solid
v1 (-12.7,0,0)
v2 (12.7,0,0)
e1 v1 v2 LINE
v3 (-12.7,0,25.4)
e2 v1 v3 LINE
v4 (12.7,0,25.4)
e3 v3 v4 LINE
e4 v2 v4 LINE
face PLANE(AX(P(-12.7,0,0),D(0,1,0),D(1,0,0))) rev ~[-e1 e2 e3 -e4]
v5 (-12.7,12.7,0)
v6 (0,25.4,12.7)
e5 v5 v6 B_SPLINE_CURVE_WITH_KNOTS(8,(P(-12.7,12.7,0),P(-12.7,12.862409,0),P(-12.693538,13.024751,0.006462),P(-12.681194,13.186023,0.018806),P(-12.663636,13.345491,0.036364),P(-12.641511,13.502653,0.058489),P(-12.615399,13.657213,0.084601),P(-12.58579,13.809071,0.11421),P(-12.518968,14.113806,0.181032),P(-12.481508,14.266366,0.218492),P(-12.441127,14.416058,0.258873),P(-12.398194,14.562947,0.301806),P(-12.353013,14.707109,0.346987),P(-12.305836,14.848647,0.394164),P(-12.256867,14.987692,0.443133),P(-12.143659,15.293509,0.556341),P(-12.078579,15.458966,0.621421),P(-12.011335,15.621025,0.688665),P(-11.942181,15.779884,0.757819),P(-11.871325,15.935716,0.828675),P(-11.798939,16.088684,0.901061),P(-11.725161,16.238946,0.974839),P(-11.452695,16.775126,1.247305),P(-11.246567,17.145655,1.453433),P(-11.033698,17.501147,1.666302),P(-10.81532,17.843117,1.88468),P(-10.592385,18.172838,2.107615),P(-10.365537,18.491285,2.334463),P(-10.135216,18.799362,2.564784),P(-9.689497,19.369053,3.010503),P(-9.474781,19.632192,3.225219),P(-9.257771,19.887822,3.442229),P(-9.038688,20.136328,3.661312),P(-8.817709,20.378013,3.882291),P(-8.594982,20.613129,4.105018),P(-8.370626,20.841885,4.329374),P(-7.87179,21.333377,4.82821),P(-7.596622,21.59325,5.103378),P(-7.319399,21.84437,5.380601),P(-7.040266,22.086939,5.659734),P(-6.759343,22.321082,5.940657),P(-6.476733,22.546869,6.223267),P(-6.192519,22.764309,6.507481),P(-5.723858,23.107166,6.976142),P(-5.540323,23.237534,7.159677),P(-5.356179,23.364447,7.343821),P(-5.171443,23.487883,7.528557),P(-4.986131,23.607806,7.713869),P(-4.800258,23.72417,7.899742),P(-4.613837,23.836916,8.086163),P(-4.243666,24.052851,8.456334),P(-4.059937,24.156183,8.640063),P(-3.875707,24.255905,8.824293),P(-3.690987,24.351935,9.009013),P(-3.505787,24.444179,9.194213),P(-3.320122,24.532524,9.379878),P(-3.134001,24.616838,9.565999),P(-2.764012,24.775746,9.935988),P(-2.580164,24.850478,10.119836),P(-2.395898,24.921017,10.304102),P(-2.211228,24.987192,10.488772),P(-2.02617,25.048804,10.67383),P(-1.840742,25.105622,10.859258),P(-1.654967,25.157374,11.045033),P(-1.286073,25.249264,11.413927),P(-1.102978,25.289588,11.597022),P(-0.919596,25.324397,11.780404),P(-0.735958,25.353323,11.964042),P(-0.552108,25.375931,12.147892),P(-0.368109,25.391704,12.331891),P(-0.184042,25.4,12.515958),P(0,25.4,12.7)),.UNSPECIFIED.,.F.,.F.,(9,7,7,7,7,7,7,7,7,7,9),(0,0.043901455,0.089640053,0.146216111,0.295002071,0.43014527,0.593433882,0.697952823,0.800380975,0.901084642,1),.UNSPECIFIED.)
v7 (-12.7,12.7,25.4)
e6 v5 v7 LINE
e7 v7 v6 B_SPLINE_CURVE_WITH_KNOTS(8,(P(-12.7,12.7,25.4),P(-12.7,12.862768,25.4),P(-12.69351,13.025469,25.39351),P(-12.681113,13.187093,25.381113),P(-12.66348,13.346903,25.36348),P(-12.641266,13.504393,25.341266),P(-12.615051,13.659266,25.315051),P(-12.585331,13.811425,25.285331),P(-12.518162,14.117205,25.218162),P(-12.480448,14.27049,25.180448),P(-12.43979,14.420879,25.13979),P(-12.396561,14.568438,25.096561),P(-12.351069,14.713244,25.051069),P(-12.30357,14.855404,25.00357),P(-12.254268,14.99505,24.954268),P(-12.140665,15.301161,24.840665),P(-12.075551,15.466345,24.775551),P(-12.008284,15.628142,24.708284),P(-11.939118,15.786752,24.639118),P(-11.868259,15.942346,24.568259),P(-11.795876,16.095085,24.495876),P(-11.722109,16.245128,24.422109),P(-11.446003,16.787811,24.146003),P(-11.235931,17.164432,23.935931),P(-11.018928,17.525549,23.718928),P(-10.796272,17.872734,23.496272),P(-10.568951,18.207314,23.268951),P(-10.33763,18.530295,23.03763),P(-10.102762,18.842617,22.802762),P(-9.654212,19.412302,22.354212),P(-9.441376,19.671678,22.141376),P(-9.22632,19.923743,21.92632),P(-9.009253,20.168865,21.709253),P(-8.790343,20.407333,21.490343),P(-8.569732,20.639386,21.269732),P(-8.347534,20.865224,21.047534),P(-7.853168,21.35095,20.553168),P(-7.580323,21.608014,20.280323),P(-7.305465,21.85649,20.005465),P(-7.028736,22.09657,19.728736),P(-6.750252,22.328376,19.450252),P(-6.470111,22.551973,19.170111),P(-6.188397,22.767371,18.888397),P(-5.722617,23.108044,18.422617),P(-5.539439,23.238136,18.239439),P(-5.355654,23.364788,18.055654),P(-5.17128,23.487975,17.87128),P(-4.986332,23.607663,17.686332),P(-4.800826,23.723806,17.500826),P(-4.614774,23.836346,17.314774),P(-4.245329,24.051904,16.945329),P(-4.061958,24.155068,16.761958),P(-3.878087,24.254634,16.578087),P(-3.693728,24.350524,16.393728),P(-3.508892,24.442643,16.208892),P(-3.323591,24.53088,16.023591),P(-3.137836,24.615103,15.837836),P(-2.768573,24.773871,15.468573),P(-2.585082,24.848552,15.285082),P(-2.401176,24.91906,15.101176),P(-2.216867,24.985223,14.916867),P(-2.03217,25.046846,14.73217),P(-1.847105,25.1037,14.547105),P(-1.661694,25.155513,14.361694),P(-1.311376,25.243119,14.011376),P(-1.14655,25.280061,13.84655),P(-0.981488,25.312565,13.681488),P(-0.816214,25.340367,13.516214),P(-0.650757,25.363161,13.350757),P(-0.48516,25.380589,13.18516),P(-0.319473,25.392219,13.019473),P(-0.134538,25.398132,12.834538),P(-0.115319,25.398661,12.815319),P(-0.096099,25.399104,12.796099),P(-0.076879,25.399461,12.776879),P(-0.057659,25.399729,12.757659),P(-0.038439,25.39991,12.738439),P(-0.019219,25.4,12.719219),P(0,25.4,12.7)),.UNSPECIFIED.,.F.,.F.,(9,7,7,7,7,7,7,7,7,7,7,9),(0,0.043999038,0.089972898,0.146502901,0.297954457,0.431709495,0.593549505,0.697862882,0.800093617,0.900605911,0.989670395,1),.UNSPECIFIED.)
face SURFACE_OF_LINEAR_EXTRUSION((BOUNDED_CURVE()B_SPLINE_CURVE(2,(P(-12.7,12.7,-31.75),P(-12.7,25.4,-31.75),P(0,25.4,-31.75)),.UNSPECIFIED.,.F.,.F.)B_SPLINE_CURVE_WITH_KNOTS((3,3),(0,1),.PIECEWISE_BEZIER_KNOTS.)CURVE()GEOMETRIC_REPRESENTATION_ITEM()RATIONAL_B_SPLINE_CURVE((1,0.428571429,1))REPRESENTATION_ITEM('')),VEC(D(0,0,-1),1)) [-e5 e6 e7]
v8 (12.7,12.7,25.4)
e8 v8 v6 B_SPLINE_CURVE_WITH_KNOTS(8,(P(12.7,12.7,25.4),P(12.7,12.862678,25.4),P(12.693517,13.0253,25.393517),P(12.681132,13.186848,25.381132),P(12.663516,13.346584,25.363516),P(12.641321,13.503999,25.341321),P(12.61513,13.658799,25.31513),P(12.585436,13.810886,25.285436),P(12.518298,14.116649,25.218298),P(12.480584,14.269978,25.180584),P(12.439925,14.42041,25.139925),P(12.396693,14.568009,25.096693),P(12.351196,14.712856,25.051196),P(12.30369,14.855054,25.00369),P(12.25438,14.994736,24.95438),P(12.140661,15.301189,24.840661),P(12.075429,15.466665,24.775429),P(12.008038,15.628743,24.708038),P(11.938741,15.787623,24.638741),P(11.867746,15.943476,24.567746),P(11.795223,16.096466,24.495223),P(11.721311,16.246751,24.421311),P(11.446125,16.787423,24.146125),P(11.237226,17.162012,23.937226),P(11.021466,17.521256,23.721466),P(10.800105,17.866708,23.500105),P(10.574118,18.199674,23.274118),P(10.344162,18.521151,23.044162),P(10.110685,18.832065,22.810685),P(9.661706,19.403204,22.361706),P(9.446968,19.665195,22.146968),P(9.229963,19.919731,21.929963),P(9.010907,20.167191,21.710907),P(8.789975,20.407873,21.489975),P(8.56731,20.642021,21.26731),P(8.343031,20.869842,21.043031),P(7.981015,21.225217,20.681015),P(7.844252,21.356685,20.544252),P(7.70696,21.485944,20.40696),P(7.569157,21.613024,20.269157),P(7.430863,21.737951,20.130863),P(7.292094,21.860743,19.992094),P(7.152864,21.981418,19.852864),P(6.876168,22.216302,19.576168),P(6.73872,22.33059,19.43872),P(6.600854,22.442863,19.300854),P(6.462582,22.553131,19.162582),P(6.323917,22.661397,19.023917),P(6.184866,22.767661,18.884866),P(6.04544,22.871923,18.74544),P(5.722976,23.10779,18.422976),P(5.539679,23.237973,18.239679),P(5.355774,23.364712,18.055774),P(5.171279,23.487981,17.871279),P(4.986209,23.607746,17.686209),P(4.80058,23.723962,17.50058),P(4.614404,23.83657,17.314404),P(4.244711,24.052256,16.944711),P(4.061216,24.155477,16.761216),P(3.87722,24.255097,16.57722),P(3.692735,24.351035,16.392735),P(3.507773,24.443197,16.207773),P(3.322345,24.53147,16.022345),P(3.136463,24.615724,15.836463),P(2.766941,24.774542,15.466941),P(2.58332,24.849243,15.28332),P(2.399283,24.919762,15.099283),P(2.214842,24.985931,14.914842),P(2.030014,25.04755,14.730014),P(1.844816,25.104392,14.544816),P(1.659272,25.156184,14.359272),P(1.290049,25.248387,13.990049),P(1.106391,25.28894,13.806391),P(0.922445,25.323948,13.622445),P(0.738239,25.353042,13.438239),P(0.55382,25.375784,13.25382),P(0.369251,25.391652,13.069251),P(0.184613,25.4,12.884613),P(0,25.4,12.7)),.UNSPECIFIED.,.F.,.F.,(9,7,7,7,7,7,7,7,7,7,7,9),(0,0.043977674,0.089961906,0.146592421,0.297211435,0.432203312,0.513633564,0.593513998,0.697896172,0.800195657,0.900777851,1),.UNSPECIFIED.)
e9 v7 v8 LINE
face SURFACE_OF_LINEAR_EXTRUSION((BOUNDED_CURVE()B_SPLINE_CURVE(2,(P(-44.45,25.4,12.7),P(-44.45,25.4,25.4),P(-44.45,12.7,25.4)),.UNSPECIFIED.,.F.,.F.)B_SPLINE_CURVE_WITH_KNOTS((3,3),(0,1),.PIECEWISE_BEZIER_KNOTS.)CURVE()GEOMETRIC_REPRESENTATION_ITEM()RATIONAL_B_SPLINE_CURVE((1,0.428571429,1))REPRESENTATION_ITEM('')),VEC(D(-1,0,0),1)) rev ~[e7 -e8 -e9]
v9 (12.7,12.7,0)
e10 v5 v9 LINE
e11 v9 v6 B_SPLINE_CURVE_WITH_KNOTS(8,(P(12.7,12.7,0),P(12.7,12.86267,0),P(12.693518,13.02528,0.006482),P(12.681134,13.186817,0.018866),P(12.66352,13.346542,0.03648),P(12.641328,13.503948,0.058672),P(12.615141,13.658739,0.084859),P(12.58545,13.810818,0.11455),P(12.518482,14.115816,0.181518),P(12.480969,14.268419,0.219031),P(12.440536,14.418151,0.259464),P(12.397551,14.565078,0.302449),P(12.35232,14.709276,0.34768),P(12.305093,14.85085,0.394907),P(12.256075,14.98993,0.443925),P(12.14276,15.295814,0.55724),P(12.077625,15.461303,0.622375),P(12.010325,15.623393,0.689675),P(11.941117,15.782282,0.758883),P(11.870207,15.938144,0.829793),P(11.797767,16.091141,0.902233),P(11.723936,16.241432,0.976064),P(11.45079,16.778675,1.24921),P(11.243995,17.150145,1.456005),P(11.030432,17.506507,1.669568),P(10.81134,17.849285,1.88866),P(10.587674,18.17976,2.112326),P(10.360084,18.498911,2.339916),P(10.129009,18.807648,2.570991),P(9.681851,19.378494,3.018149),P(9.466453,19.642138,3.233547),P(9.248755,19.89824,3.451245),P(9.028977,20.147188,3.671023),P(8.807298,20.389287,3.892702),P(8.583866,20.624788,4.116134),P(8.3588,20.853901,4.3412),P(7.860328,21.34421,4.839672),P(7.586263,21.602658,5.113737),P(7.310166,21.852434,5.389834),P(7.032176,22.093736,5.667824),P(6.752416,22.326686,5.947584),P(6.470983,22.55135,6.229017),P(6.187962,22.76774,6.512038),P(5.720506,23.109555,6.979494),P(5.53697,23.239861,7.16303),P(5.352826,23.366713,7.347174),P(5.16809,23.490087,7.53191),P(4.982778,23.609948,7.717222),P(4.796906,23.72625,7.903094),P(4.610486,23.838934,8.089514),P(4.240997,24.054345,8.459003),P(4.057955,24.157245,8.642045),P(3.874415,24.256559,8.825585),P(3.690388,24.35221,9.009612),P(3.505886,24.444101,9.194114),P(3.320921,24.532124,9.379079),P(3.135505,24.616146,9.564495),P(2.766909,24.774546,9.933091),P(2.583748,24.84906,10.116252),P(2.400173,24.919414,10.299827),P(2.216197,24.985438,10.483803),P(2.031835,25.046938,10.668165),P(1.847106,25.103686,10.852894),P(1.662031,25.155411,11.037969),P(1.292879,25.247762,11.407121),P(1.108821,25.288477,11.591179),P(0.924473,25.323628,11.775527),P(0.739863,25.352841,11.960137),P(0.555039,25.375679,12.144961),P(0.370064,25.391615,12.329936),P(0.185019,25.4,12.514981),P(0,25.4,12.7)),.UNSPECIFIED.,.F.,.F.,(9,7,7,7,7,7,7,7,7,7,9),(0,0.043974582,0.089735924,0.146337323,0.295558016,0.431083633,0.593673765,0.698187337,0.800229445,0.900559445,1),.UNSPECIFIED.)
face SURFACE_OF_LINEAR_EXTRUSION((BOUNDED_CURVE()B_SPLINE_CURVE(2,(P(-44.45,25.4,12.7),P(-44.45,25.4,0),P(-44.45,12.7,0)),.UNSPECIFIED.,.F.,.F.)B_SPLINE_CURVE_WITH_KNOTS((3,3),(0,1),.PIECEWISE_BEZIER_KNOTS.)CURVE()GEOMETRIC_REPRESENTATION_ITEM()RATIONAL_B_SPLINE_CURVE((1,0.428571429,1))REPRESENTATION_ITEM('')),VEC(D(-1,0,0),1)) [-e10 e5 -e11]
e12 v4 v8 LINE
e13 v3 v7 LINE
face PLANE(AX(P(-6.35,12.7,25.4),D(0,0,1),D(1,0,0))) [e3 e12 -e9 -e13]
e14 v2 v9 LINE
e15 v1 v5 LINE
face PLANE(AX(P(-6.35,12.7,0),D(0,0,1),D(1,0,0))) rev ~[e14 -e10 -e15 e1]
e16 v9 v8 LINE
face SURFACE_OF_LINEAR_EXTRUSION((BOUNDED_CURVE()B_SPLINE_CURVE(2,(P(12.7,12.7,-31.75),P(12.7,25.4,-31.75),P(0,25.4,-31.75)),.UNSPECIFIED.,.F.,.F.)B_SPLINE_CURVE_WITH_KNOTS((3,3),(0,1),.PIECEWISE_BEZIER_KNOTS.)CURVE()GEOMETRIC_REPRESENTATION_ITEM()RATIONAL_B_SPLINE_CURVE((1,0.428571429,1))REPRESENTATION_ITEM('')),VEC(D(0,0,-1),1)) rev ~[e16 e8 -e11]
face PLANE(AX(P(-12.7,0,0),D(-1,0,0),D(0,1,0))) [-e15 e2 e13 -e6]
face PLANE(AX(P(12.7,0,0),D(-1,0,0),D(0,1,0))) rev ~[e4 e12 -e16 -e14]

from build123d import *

# Parameters (mm, degrees)
F0_W        = 12.7
F0_H        = 25.4
F1_DEPTH    = 25.4
F2_T1_DEPTH = 88.9
F2_T3_DEPTH = 88.9


# Not quite as in the source:
# - a fillet or chamfer that OpenCascade refuses, or shapes differently, is made with other operations: its cross-section is extruded or revolved along the edge and cut away or added


with BuildPart() as f1:
    # F0 (on Top) → F1 (new body)
    with BuildSketch(Plane.XY):
        with Locations((-6.35, 12.7)):
            Rectangle(F0_W, F0_H)
        with Locations((6.35, 12.7)):
            Rectangle(F0_W, F0_H)
    extrude(amount=F1_DEPTH)

    # F2: fillet of radius 12.7 on 4 edges, made by hand

    # F2_s2 → F2_t1 (cut)
    with BuildSketch(Plane.XY.offset(-31.75)):
        with BuildLine():
            add(Edge.make_bspline(
                [(12.7, 12.7), (12.7, 25.4), (0, 25.4)],
                knots=[0, 0, 0, 1, 1, 1], degree=2, weights=[1, 0.4285714286, 1]))
            Line((0, 25.4), (12.7, 25.4))
            Line((12.7, 25.4), (12.7, 12.7))
        make_face()
        with BuildLine():
            add(Edge.make_bspline(
                [(-12.7, 12.7), (-12.7, 25.4), (0, 25.4)],
                knots=[0, 0, 0, 1, 1, 1], degree=2, weights=[1, 0.4285714286, 1]))
            Line((0, 25.4), (-12.7, 25.4))
            Line((-12.7, 25.4), (-12.7, 12.7))
        make_face()
    extrude(amount=F2_T1_DEPTH, mode=Mode.SUBTRACT)

    # F2_s4 → F2_t3 (cut)
    with BuildSketch(Plane.YZ.offset(-44.45)):
        with BuildLine():
            add(Edge.make_bspline(
                [(25.4, 12.7), (25.4, 0), (12.7, 0)],
                knots=[0, 0, 0, 1, 1, 1], degree=2, weights=[1, 0.4285714286, 1]))
            Line((12.7, 0), (25.4, 0))
            Line((25.4, 0), (25.4, 12.7))
        make_face()
        with BuildLine():
            add(Edge.make_bspline(
                [(25.4, 12.7), (25.4, 25.4), (12.7, 25.4)],
                knots=[0, 0, 0, 1, 1, 1], degree=2, weights=[1, 0.4285714286, 1]))
            Line((12.7, 25.4), (25.4, 25.4))
            Line((25.4, 25.4), (25.4, 12.7))
        make_face()
    extrude(amount=F2_T3_DEPTH, mode=Mode.SUBTRACT)


solid = f1.part
